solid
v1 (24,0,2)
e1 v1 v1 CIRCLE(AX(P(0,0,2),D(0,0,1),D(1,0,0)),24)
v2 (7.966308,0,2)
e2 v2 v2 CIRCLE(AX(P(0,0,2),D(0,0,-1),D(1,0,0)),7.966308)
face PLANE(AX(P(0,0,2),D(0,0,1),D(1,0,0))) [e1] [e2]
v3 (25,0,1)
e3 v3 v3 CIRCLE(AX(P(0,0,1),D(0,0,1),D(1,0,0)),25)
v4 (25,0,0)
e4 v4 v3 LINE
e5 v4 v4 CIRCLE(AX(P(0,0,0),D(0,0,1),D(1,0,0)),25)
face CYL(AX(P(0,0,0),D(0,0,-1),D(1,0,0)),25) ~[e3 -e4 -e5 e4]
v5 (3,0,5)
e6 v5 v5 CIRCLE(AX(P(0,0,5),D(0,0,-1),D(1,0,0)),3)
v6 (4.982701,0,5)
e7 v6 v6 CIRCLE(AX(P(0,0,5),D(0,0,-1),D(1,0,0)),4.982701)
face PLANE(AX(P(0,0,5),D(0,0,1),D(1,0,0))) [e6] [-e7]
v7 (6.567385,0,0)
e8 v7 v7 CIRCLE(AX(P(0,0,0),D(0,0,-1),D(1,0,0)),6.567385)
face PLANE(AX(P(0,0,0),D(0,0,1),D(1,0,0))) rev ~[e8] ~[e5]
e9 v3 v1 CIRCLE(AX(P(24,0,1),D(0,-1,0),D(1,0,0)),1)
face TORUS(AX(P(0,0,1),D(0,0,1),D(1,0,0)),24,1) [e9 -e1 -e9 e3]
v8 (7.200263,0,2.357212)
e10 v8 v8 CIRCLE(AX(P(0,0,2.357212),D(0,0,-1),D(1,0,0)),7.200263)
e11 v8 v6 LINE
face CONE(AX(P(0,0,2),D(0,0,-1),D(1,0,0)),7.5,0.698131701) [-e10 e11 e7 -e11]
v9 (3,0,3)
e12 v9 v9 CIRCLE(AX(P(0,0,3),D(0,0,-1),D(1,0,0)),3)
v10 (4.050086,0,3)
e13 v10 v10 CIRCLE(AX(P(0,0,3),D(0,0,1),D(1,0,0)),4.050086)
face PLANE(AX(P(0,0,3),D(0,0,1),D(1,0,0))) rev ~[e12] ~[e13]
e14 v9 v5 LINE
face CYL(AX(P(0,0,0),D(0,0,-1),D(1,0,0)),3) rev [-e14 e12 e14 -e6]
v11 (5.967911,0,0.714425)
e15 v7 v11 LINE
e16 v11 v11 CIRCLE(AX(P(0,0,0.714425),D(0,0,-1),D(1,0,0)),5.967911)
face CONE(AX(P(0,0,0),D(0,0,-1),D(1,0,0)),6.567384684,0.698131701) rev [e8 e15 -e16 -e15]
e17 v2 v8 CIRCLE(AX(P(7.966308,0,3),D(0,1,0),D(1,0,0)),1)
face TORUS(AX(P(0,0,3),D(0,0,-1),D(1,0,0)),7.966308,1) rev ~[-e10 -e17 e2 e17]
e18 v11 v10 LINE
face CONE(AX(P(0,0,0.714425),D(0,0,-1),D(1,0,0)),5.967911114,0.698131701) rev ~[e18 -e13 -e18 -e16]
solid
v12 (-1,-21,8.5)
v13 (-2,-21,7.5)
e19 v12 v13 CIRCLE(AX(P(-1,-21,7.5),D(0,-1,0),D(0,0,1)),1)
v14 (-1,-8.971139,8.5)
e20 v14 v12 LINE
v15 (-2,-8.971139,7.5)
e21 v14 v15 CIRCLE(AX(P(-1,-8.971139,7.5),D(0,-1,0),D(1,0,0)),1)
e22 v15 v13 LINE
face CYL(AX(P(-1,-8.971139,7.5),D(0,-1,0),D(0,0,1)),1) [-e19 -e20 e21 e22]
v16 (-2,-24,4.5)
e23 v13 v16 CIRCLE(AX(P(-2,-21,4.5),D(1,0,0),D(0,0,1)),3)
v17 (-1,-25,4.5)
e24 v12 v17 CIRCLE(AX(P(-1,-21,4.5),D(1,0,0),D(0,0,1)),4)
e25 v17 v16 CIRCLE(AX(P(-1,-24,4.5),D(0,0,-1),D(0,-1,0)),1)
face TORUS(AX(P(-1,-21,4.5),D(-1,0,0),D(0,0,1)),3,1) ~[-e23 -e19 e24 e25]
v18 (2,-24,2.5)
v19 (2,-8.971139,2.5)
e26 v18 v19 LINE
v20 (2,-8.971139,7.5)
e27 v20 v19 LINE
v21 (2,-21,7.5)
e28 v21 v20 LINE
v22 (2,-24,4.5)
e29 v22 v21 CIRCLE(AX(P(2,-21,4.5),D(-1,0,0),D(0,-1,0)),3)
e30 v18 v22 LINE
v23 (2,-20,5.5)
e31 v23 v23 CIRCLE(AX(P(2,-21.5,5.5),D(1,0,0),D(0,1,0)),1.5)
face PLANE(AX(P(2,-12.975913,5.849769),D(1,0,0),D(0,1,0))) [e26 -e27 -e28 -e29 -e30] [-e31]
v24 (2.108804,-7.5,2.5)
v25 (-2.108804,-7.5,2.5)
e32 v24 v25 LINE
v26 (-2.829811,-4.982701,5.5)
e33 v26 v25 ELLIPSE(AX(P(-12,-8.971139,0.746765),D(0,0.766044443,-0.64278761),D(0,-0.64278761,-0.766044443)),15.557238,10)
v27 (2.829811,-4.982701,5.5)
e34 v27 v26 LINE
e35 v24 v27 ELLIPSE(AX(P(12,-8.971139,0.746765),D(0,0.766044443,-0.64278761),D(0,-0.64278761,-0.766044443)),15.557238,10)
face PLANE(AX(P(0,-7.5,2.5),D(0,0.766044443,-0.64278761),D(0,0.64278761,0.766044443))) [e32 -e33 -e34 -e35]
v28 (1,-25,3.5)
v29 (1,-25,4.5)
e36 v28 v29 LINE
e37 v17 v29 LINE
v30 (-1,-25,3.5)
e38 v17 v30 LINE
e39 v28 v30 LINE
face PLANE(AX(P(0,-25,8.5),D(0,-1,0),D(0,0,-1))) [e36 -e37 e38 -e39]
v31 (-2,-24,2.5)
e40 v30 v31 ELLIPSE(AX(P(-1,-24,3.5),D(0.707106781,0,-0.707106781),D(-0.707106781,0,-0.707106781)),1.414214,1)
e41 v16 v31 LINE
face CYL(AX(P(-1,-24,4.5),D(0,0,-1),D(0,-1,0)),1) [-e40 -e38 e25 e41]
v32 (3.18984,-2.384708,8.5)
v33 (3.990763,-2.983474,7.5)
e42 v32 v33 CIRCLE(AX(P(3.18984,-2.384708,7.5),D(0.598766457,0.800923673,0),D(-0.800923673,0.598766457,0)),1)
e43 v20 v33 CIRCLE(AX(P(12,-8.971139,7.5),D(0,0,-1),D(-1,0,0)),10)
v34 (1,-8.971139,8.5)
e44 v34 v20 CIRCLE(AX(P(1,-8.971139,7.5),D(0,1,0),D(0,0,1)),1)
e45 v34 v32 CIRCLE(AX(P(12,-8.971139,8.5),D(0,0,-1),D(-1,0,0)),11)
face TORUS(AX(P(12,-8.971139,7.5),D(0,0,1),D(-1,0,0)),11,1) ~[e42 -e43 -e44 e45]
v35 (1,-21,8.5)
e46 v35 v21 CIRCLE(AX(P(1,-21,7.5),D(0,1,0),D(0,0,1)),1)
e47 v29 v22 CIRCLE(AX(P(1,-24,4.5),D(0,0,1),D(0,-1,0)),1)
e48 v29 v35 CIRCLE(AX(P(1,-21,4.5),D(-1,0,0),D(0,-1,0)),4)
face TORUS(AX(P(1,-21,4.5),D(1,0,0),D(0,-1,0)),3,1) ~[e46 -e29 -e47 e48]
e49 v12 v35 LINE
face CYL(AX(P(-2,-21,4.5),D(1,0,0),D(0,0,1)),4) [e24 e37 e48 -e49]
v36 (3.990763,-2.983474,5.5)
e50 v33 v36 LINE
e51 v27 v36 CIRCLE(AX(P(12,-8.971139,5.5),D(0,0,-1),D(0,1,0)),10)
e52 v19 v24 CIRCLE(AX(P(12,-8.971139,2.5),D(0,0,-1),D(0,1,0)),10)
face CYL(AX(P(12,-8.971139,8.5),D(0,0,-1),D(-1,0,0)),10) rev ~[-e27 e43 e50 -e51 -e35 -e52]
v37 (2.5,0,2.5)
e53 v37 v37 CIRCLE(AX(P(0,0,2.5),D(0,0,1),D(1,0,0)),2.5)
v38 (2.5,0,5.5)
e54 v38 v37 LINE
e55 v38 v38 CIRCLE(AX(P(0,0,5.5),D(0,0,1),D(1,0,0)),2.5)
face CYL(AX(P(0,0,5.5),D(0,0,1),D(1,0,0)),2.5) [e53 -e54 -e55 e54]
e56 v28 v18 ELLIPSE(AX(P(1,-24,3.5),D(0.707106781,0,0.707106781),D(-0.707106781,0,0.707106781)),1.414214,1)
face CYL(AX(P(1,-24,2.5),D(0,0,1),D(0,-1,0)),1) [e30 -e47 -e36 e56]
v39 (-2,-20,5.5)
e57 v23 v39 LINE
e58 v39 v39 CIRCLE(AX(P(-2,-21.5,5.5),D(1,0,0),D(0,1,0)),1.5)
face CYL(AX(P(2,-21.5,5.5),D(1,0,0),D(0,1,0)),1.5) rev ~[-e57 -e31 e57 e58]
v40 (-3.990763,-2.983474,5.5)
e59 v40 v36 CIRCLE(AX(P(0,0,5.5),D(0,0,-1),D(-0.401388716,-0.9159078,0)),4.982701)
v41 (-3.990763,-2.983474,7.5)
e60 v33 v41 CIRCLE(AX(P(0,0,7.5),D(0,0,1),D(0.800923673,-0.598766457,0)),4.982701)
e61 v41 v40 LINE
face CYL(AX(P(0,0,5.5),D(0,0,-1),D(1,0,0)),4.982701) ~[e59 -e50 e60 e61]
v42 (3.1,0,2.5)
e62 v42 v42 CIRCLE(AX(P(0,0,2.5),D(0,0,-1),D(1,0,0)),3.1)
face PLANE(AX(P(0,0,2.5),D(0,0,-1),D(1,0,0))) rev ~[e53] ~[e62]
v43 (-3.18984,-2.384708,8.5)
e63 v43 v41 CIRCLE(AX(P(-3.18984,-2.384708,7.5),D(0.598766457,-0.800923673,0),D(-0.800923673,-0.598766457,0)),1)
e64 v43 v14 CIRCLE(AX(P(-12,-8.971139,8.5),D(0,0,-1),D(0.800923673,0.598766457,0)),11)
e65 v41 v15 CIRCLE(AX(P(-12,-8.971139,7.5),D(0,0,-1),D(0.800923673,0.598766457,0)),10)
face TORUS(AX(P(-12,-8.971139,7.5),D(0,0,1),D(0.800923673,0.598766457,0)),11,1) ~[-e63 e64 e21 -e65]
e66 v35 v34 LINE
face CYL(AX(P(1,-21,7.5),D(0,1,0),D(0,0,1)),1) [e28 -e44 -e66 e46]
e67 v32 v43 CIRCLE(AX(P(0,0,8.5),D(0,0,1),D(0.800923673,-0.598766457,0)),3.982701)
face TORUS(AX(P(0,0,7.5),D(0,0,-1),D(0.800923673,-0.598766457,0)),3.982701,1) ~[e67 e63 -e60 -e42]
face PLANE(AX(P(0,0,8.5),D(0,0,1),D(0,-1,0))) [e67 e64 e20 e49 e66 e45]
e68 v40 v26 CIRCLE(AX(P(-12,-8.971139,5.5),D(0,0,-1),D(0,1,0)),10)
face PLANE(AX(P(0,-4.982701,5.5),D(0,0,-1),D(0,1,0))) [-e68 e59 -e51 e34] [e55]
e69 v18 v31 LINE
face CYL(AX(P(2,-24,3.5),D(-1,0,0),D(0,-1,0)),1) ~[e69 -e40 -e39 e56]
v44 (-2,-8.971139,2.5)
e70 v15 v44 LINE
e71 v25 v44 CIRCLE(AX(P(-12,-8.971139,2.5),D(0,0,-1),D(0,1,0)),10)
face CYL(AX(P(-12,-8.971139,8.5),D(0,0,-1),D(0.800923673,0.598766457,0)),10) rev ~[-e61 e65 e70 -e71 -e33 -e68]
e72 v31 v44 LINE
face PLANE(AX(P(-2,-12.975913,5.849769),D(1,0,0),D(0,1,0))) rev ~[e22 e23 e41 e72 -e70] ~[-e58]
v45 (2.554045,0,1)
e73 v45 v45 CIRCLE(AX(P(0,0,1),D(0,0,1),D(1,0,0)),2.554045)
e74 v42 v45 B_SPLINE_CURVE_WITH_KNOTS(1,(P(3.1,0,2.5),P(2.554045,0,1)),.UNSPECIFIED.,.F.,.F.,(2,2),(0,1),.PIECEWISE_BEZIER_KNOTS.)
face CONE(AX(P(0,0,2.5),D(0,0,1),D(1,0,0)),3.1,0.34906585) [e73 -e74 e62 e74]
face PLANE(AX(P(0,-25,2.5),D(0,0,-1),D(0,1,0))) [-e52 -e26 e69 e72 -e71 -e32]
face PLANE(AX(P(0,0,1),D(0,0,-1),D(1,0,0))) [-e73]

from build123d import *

# Parameters (mm, degrees)
F0_R      = 25
F1_DEPTH  = 2
F3_R      = 7.5
F4_DEPTH  = 3
F4_TAPER  = 40
F5_T      = 2
F2_R      = 3
F6_DEPTH  = 5.001
F8_R      = 2.5
F9_DEPTH  = 3
F10_R     = 3.1
F11_DEPTH = 1.5
F11_TAPER = 20
F13_R     = 4.9827011065
F14_DEPTH = 3
F15_DEPTH = 2
F16_R     = 10
F17_R     = 4
F18_R     = 1.5
F19_DEPTH = 27.001
F20_R     = 1
F21_R     = 1


# Not quite as in the source:
# - a shell that OpenCascade refuses in one call is made with other operations: the cavity is built on its own and cut out


with BuildPart() as f1:
    # F0 (on Top) → F1 (new body)
    with BuildSketch(Plane.XY):
        Circle(F0_R)
    extrude(amount=F1_DEPTH)

    # F3 (on face) → F4 (join)
    with BuildSketch(Plane.XY.offset(2)):
        Circle(F3_R)
    extrude(amount=F4_DEPTH, taper=F4_TAPER)

    # F5: shell of thickness 2, made by hand


with BuildPart() as f5_core1:
    # F5_t2: copy of F1
    add(f1.part)

    # the walls: a layer under each face that stays
    f5_faces = [f5_core1.faces().sort_by_distance(p)[0] for p in [
        (-25, 0, 1),
        (-16.6666666667, -16.6666666667, 2),
        (-6.2413505532, 0, 3.5),
        (0, 0, 5),
    ]]
    thicken(f5_faces, amount=-F5_T, mode=Mode.SUBTRACT)

    # F5_s3 → F5_t4 (revolve, cut)
    with BuildSketch(Plane.XZ):
        Polygon((7.5153208889, 2.0328557522), (7.5, 0), (6.5673846837, 0), (5.9679111138, 0.7144247806), align=None)
    revolve(axis=Axis((0, 0, 2), (0, 0, -1)), mode=Mode.SUBTRACT)


with BuildPart() as f1_1:
    add(f1.part)

    # what is left inside the walls is the cavity
    f5_cavity = [f5_core1.part.solids().sort_by_distance(p)[0] for p in [
        (0, -2.189128, 0.02),
    ]]
    add(f5_cavity, mode=Mode.SUBTRACT)

    # F2 (on Top) → F6 (cut, through all)
    with BuildSketch(Plane.XY):
        Circle(F2_R)
    extrude(amount=F6_DEPTH, mode=Mode.SUBTRACT)

    # F21
    f21_edges = [f1_1.edges().sort_by_distance(p)[0] for p in [
        (-25, 0, 2),
        (-7.5, 0, 2),
    ]]
    fillet(f21_edges, radius=F21_R)


with BuildPart() as f9:
    # F8 (on offset) → F9 (new body)
    with BuildSketch(Plane.XY.offset(5.5)):
        Circle(F8_R)
    extrude(amount=-F9_DEPTH)

    # F10 (on face) → F11 (join)
    with BuildSketch(Plane(origin=(0, 0, 2.5), x_dir=(1, 0, 0), z_dir=(0, 0, -1))):
        Circle(F10_R)
    extrude(amount=F11_DEPTH, taper=F11_TAPER)

    # F13 (on offset) → F14 (join)
    with BuildSketch(Plane.XY.offset(5.5)):
        Circle(F13_R)
    extrude(amount=F14_DEPTH)

    # F12 (on Right) → F15 (join, symmetric)
    with BuildSketch(Plane.YZ):
        Polygon((-4.9827011065, 5.5), (-2.5, 5.5), (0, 5.5), (0, 8.5), (-25, 8.5), (-25, 2.5), (-7.5, 2.5), align=None)
    extrude(amount=F15_DEPTH, both=True)

    # F16 (call 1 of 2: OpenCascade refuses the feature's edges together)
    f16_edges = [f9.edges().sort_by_distance(p)[0] for p in [
        (2, -4.563695, 7),
    ]]
    fillet(f16_edges, radius=F16_R)

    # F16#2 (call 2 of 2)
    f16_2_edges = [f9.edges().sort_by_distance(p)[0] for p in [
        (-2, -4.563695, 7),
    ]]
    fillet(f16_2_edges, radius=F16_R)

    # F17
    f17_edges = [f9.edges().sort_by_distance(p)[0] for p in [
        (0, -25, 8.5),
    ]]
    fillet(f17_edges, radius=F17_R)

    # F18 (on face) → F19 (cut, through all)
    with BuildSketch(Plane.YZ.offset(2)):
        with Locations((-21.5, 5.5)):
            Circle(F18_R)
    extrude(amount=-F19_DEPTH, mode=Mode.SUBTRACT)

    # F20
    f20_edges = [f9.edges().sort_by_distance(p)[0] for p in [
        (-2, -14.985569, 8.5),
        (0, -21, 8.5),
        (-2.510733, -5.816172, 8.5),
        (2, -14.985569, 8.5),
        (0, 4.982701, 8.5),
        (2.510733, -5.816172, 8.5),
        (-2, -23.828427, 7.328427),
        (0, -25, 4.5),
        (2, -23.828427, 7.328427),
        (-2, -25, 3.5),
        (0, -25, 2.5),
        (2, -25, 3.5),
    ]]
    fillet(f20_edges, radius=F20_R)


solid = Compound([f1_1.part, f9.part])
